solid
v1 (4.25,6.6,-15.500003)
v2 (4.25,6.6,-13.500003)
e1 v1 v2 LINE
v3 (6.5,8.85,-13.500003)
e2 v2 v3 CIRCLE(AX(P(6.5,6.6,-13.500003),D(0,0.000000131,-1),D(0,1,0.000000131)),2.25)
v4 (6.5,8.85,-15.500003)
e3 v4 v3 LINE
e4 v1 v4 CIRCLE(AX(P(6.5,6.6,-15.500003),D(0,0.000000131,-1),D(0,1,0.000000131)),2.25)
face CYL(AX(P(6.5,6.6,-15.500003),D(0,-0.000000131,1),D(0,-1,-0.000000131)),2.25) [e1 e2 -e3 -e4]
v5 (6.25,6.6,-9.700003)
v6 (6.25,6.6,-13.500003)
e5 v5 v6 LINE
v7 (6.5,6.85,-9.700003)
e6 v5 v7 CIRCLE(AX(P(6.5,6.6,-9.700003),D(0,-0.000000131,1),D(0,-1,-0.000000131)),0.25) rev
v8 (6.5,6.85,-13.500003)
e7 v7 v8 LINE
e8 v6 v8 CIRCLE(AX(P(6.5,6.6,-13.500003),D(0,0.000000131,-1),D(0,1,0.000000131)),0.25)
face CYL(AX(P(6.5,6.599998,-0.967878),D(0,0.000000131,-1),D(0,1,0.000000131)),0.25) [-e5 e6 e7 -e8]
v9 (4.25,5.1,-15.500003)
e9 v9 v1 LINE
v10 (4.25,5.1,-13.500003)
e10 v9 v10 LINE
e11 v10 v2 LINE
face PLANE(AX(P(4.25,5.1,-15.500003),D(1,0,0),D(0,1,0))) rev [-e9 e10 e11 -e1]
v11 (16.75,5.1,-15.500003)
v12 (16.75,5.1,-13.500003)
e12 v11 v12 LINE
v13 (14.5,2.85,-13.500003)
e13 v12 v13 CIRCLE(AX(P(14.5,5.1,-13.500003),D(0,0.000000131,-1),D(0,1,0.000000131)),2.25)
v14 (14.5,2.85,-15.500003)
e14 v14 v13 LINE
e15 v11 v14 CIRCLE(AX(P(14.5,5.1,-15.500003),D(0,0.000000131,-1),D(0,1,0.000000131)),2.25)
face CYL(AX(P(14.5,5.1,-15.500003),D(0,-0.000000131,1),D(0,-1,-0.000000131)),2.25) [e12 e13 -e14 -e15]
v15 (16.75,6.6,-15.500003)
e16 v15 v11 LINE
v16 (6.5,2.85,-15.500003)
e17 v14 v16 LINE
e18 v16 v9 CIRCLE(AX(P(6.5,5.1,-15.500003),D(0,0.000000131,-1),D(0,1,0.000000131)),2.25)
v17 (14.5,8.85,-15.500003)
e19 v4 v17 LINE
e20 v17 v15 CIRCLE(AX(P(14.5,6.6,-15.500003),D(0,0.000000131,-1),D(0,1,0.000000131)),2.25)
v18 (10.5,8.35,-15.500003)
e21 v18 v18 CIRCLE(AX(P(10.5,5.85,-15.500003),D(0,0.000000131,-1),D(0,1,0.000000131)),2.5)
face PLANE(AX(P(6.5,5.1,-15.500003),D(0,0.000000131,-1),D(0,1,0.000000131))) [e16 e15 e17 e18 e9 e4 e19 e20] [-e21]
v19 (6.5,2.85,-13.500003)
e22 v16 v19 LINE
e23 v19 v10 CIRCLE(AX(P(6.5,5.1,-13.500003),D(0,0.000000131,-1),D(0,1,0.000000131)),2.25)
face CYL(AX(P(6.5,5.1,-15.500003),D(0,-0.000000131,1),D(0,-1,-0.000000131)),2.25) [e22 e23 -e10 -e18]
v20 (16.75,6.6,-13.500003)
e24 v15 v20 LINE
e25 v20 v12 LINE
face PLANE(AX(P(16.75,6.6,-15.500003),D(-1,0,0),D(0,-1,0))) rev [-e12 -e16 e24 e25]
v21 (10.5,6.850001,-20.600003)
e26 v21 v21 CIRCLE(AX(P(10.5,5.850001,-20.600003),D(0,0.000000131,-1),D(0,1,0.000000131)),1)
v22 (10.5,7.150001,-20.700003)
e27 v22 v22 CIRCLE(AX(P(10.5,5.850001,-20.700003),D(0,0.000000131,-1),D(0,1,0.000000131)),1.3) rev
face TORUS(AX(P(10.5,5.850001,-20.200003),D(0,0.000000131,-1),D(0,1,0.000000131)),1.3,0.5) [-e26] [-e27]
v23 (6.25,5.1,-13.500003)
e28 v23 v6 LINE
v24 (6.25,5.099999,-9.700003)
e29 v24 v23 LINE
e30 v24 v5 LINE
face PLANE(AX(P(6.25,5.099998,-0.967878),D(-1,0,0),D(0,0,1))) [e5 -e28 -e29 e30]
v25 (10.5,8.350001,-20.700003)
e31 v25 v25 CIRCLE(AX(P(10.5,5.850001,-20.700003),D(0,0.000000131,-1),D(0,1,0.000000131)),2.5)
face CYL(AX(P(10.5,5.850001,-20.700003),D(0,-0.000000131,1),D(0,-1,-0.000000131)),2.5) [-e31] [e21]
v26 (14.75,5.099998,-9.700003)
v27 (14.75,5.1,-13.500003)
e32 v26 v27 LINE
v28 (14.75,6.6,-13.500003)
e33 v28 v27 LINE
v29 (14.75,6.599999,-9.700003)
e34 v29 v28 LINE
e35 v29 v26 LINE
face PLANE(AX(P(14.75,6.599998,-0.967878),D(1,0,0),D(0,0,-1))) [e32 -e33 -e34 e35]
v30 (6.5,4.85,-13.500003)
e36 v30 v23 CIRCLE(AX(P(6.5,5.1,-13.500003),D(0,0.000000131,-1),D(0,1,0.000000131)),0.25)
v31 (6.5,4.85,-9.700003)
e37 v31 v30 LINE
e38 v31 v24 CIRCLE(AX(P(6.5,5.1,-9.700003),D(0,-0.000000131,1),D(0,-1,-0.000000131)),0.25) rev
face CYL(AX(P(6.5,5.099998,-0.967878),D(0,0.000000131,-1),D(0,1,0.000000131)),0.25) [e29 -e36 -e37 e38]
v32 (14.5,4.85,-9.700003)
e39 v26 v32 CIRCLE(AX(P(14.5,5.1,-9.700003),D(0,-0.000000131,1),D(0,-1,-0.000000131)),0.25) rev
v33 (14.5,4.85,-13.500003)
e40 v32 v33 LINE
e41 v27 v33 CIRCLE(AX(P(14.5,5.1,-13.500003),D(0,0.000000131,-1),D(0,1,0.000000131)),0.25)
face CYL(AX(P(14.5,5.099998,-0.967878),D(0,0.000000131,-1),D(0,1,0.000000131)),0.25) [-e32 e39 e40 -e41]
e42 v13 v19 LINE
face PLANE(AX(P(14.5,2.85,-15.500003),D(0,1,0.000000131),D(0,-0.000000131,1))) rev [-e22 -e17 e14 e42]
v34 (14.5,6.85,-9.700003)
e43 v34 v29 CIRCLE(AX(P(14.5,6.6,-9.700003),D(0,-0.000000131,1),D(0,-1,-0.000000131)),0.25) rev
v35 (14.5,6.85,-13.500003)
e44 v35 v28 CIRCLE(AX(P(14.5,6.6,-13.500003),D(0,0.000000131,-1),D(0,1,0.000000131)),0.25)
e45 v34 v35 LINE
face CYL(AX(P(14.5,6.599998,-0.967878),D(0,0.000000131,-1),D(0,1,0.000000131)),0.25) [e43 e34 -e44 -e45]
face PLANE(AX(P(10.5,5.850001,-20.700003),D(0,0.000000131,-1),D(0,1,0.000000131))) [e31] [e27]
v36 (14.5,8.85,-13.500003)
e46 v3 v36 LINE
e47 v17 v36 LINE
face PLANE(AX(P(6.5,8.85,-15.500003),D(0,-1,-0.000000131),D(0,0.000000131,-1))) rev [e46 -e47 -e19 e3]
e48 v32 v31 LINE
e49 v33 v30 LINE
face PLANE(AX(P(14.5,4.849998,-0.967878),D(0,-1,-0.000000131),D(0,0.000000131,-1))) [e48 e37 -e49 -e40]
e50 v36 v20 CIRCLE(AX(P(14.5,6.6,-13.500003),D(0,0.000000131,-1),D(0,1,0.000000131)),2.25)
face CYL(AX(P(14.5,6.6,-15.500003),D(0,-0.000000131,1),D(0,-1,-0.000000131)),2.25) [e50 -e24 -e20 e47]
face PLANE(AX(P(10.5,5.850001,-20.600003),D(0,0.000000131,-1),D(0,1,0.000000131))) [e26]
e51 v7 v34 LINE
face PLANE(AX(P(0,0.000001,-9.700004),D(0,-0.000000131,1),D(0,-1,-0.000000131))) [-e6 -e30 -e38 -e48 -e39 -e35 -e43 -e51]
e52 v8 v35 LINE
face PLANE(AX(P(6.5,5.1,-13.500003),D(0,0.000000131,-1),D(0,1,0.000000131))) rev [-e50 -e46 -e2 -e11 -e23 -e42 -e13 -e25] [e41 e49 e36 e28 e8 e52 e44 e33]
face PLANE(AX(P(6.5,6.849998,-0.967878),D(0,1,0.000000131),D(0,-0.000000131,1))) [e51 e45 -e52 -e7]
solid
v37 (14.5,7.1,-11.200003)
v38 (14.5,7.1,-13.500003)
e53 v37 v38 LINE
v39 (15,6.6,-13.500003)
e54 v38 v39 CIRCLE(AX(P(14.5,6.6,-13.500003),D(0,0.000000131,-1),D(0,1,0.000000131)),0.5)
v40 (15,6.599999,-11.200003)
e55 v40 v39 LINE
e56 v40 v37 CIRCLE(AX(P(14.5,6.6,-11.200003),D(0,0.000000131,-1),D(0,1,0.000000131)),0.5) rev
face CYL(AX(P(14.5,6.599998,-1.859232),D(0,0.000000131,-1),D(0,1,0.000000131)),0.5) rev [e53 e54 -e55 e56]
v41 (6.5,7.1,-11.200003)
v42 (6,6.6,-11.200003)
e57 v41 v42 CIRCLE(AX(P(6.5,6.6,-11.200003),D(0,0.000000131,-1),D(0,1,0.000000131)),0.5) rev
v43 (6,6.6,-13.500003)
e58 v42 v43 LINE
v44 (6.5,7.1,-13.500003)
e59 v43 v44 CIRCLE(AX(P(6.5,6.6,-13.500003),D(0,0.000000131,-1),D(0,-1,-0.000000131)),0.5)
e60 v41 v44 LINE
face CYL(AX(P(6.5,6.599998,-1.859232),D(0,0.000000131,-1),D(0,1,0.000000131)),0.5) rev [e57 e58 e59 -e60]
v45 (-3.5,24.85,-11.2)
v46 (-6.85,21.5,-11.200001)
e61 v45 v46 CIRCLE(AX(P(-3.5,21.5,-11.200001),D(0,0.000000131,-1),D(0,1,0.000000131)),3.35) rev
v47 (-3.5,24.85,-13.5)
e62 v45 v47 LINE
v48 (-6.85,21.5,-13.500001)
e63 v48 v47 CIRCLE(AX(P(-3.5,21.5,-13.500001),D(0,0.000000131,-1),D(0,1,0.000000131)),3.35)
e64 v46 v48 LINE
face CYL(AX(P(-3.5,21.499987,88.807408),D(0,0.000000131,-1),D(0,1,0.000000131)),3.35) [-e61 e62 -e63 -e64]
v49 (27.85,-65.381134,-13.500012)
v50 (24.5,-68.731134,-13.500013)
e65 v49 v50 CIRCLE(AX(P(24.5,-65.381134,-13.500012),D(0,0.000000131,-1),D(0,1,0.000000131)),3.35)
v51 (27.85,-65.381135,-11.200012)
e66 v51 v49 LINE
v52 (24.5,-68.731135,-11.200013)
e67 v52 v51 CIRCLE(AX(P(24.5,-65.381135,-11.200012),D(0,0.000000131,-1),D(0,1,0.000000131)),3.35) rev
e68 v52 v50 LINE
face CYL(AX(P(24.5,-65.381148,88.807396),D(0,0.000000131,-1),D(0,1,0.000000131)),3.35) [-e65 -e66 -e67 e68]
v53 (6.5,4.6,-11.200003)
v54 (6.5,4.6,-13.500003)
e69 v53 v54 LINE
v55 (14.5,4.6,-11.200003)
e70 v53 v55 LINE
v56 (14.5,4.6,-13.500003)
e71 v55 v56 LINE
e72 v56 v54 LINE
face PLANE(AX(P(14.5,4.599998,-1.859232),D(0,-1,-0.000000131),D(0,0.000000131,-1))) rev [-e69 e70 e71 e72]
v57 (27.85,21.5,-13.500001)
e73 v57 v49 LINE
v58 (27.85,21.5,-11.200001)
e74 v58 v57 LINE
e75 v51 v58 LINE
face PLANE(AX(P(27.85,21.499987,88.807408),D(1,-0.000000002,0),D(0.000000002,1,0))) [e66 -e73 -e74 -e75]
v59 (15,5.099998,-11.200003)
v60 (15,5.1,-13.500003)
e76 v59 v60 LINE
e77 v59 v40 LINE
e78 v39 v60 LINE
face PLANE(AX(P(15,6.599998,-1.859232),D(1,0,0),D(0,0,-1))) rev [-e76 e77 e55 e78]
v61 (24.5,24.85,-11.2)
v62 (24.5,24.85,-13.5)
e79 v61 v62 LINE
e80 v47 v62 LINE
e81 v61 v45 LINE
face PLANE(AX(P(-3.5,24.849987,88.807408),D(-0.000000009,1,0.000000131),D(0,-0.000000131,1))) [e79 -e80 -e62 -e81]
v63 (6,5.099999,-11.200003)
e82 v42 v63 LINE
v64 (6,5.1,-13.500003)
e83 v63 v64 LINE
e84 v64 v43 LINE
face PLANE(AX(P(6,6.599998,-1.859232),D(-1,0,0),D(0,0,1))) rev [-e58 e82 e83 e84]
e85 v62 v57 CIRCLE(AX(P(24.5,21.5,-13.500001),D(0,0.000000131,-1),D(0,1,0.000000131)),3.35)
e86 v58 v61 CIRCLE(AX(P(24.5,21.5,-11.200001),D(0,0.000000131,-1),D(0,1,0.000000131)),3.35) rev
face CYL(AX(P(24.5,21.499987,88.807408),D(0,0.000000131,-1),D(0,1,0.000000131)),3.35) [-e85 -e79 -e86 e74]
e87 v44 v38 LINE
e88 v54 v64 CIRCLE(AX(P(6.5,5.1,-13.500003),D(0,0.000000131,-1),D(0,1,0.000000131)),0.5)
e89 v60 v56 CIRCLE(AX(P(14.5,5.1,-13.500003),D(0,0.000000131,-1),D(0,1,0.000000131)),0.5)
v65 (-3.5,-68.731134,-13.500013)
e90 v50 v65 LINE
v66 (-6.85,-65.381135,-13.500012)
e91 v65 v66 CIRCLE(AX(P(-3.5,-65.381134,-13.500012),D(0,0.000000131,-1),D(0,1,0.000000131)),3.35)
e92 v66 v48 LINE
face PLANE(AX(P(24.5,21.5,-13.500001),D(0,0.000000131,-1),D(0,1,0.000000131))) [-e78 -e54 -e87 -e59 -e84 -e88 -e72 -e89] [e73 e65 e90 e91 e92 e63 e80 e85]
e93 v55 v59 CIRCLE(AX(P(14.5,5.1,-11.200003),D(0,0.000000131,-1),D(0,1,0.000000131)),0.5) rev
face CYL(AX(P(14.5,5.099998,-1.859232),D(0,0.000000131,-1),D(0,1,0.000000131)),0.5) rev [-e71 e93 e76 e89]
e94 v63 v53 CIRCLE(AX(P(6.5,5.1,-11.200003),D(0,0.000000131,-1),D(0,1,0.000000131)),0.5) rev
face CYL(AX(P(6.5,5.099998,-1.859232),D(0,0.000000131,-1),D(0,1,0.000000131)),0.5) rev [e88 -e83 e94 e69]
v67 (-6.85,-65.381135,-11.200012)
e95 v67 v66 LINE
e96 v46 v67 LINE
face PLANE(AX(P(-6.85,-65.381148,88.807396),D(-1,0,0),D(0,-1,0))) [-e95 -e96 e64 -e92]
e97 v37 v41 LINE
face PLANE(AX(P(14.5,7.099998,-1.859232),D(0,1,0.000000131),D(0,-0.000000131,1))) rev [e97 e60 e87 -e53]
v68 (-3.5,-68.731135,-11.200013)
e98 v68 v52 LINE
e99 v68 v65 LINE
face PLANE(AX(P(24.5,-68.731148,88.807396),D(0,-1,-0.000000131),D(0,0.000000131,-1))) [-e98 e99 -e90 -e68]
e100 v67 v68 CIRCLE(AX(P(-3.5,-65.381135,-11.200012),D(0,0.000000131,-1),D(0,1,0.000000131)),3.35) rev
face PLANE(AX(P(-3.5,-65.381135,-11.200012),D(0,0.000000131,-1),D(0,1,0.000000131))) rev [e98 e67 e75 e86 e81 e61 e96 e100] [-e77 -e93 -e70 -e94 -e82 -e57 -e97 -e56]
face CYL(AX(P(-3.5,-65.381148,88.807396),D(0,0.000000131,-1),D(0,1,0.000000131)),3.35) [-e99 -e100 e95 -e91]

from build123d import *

# Parameters (mm, degrees)
STOCK_PB_TOP_LID_SM_1_START = 11.200003695
STOCK_PB_TOP_LID_SM_1_DEPTH = 2.3
BOSS_EXTRUDE1_DEPTH         = 3.8
BOSS_EXTRUDE2_DEPTH         = 2
SKETCH5_R                   = 2.5
BOSS_EXTRUDE3_DEPTH         = 5.2
SKETCH6_R                   = 1
CUT_EXTRUDE1_DEPTH          = 0.1
FILLET1_R                   = 0.5


# Read off the part's stored shape, not the designer's step: Stock-pb_top_lid_sm-1
with BuildPart() as part:
    # Stock-pb_top_lid_sm-1 outline → Stock-pb_top_lid_sm-1 (new body)
    with BuildSketch(Plane(origin=(0, 0, 0), x_dir=(1, 0, 0), z_dir=(0, 1.3113422028449806e-07, -0.9999999999999915)).offset(STOCK_PB_TOP_LID_SM_1_START)):
        with BuildLine():
            Line((-3.5, -24.849998248), (24.5, -24.849998482))
            ThreePointArc((24.5, -24.849998482), (26.868807895, -23.868806125), (27.850000252, -21.49999823))
            Line((27.850000252, -21.49999823), (27.85, 65.381136149))
            ThreePointArc((27.85, 65.381136149), (26.868807717, 67.749943866), (24.5, 68.731136149))
            Line((24.5, 68.731136149), (-3.5, 68.731136149))
            ThreePointArc((-3.5, 68.731136149), (-5.868807606, 67.749943977), (-6.85, 65.381136463))
            Line((-6.85, 65.381136463), (-6.850000018, -21.49999823))
            ThreePointArc((-6.850000018, -21.49999823), (-5.86880773, -23.86880596), (-3.5, -24.849998248))
        make_face()
        with BuildLine():
            ThreePointArc((14.500000108, -4.599998248), (14.853553499, -4.746444857), (15.000000108, -5.099998248))
            Line((15.000000108, -5.099998248), (15.000000108, -6.599997786))
            ThreePointArc((15.000000108, -6.599997786), (14.853553662, -6.953551475), (14.500000108, -7.099998248))
            Line((14.500000108, -7.099998248), (6.500000108, -7.099998248))
            ThreePointArc((6.500000108, -7.099998248), (6.146446718, -6.953551638), (6.000000108, -6.599998248))
            Line((6.000000108, -6.599998248), (6.000000108, -5.099998248))
            ThreePointArc((6.000000108, -5.099998248), (6.146446717, -4.746444858), (6.500000108, -4.599998248))
            Line((6.500000108, -4.599998248), (14.500000108, -4.599998248))
        make_face(mode=Mode.SUBTRACT)
    extrude(amount=STOCK_PB_TOP_LID_SM_1_DEPTH)


with BuildPart() as body_2:
    # Sketch3 → Boss-Extrude1 (new body)
    with BuildSketch(Plane(origin=(0, 1.77e-06, -13.500003695), x_dir=(-1, 0, 0), z_dir=(0, 1.3113422028449777e-07, -0.9999999999999915))):
        with BuildLine():
            Line((-14.500000108, 4.849998248), (-6.500000108, 4.849998248))
            ThreePointArc((-6.500000108, 4.849998248), (-6.323223413, 4.923221552), (-6.250000108, 5.099998248))
            Line((-6.250000108, 5.099998248), (-6.250000108, 6.599998248))
            ThreePointArc((-6.250000108, 6.599998248), (-6.323223413, 6.776774943), (-6.500000108, 6.849998248))
            Line((-6.500000108, 6.849998248), (-14.500000108, 6.849998248))
            ThreePointArc((-14.500000108, 6.849998248), (-14.676776803, 6.776774943), (-14.750000108, 6.599998248))
            Line((-14.750000108, 6.599998248), (-14.750000108, 5.099998248))
            ThreePointArc((-14.750000108, 5.099998248), (-14.676776803, 4.923221552), (-14.500000108, 4.849998248))
        make_face()
    extrude(amount=-BOSS_EXTRUDE1_DEPTH)

    # Sketch4 → Boss-Extrude2 (add)
    with BuildSketch(Plane(origin=(0, 1.77e-06, -13.500003695), x_dir=(-1, 0, 0), z_dir=(0, 1.311342202844978e-07, -0.9999999999999915))):
        with BuildLine():
            Line((-4.250000108, 5.099998248), (-4.250000108, 6.599998248))
            ThreePointArc((-4.250000108, 6.599998248), (-4.909009851, 8.190988505), (-6.500000108, 8.849998248))
            Line((-6.500000108, 8.849998248), (-14.500000108, 8.849998248))
            ThreePointArc((-14.500000108, 8.849998248), (-16.090990366, 8.190988505), (-16.750000108, 6.599998248))
            Line((-16.750000108, 6.599998248), (-16.750000108, 5.099998248))
            ThreePointArc((-16.750000108, 5.099998248), (-16.090990366, 3.50900799), (-14.500000108, 2.849998248))
            Line((-14.500000108, 2.849998248), (-6.500000108, 2.849998248))
            ThreePointArc((-6.500000108, 2.849998248), (-4.909009851, 3.50900799), (-4.250000108, 5.099998248))
        make_face()
    extrude(amount=BOSS_EXTRUDE2_DEPTH)

    # Sketch5 → Boss-Extrude3 (add)
    with BuildSketch(Plane(origin=(0, 2.033e-06, -15.500003695), x_dir=(-1, 0, 0), z_dir=(0, 1.3113422028449782e-07, -0.9999999999999915))):
        with Locations(Location((-10.500000108, 5.849998248, 0), (0, 0, 90))):
            Circle(SKETCH5_R)
    extrude(amount=BOSS_EXTRUDE3_DEPTH)

    # Sketch6 → Cut-Extrude1 (cut)
    with BuildSketch(Plane(origin=(0, 2.714e-06, -20.700003695), x_dir=(-1, 0, 0), z_dir=(0, 1.3113422028449785e-07, -0.9999999999999915))):
        with Locations(Location((-10.500000108, 5.849998248, 0), (0, 0, 90))):
            Circle(SKETCH6_R)
    extrude(amount=-CUT_EXTRUDE1_DEPTH, mode=Mode.SUBTRACT)

    # Fillet1
    # the kernel refuses this fillet: 0.5 mm, written as the material it takes off along each edge
    with BuildSketch(Plane(origin=(10.500000108, 5.850000962, -20.700002928), x_dir=(0, 0.9999999999999915, 1.3113421815091902e-07), z_dir=(-1, 0, 0))) as fillet1_piece_1:
        with BuildLine():
            CenterArc((1.3, -0.5), FILLET1_R, 90, 36.869897646)
            Line((1, -0.1), (0.994, -0.092))
            ThreePointArc((0.994, -0.092), (0.99, -0.05), (0.99, 0))
            Line((0.99, 0), (1, 0.01))
            Line((1, 0.01), (1.3, 0.01))
            Line((1.3, 0.01), (1.3, 0))
        make_face()
    revolve(axis=Axis((10.500000108, 5.850000962, -20.700002928), (0, 1.3113422028449785e-07, -0.9999999999999915)), mode=Mode.SUBTRACT)


solid = Compound([part.part, body_2.part])
